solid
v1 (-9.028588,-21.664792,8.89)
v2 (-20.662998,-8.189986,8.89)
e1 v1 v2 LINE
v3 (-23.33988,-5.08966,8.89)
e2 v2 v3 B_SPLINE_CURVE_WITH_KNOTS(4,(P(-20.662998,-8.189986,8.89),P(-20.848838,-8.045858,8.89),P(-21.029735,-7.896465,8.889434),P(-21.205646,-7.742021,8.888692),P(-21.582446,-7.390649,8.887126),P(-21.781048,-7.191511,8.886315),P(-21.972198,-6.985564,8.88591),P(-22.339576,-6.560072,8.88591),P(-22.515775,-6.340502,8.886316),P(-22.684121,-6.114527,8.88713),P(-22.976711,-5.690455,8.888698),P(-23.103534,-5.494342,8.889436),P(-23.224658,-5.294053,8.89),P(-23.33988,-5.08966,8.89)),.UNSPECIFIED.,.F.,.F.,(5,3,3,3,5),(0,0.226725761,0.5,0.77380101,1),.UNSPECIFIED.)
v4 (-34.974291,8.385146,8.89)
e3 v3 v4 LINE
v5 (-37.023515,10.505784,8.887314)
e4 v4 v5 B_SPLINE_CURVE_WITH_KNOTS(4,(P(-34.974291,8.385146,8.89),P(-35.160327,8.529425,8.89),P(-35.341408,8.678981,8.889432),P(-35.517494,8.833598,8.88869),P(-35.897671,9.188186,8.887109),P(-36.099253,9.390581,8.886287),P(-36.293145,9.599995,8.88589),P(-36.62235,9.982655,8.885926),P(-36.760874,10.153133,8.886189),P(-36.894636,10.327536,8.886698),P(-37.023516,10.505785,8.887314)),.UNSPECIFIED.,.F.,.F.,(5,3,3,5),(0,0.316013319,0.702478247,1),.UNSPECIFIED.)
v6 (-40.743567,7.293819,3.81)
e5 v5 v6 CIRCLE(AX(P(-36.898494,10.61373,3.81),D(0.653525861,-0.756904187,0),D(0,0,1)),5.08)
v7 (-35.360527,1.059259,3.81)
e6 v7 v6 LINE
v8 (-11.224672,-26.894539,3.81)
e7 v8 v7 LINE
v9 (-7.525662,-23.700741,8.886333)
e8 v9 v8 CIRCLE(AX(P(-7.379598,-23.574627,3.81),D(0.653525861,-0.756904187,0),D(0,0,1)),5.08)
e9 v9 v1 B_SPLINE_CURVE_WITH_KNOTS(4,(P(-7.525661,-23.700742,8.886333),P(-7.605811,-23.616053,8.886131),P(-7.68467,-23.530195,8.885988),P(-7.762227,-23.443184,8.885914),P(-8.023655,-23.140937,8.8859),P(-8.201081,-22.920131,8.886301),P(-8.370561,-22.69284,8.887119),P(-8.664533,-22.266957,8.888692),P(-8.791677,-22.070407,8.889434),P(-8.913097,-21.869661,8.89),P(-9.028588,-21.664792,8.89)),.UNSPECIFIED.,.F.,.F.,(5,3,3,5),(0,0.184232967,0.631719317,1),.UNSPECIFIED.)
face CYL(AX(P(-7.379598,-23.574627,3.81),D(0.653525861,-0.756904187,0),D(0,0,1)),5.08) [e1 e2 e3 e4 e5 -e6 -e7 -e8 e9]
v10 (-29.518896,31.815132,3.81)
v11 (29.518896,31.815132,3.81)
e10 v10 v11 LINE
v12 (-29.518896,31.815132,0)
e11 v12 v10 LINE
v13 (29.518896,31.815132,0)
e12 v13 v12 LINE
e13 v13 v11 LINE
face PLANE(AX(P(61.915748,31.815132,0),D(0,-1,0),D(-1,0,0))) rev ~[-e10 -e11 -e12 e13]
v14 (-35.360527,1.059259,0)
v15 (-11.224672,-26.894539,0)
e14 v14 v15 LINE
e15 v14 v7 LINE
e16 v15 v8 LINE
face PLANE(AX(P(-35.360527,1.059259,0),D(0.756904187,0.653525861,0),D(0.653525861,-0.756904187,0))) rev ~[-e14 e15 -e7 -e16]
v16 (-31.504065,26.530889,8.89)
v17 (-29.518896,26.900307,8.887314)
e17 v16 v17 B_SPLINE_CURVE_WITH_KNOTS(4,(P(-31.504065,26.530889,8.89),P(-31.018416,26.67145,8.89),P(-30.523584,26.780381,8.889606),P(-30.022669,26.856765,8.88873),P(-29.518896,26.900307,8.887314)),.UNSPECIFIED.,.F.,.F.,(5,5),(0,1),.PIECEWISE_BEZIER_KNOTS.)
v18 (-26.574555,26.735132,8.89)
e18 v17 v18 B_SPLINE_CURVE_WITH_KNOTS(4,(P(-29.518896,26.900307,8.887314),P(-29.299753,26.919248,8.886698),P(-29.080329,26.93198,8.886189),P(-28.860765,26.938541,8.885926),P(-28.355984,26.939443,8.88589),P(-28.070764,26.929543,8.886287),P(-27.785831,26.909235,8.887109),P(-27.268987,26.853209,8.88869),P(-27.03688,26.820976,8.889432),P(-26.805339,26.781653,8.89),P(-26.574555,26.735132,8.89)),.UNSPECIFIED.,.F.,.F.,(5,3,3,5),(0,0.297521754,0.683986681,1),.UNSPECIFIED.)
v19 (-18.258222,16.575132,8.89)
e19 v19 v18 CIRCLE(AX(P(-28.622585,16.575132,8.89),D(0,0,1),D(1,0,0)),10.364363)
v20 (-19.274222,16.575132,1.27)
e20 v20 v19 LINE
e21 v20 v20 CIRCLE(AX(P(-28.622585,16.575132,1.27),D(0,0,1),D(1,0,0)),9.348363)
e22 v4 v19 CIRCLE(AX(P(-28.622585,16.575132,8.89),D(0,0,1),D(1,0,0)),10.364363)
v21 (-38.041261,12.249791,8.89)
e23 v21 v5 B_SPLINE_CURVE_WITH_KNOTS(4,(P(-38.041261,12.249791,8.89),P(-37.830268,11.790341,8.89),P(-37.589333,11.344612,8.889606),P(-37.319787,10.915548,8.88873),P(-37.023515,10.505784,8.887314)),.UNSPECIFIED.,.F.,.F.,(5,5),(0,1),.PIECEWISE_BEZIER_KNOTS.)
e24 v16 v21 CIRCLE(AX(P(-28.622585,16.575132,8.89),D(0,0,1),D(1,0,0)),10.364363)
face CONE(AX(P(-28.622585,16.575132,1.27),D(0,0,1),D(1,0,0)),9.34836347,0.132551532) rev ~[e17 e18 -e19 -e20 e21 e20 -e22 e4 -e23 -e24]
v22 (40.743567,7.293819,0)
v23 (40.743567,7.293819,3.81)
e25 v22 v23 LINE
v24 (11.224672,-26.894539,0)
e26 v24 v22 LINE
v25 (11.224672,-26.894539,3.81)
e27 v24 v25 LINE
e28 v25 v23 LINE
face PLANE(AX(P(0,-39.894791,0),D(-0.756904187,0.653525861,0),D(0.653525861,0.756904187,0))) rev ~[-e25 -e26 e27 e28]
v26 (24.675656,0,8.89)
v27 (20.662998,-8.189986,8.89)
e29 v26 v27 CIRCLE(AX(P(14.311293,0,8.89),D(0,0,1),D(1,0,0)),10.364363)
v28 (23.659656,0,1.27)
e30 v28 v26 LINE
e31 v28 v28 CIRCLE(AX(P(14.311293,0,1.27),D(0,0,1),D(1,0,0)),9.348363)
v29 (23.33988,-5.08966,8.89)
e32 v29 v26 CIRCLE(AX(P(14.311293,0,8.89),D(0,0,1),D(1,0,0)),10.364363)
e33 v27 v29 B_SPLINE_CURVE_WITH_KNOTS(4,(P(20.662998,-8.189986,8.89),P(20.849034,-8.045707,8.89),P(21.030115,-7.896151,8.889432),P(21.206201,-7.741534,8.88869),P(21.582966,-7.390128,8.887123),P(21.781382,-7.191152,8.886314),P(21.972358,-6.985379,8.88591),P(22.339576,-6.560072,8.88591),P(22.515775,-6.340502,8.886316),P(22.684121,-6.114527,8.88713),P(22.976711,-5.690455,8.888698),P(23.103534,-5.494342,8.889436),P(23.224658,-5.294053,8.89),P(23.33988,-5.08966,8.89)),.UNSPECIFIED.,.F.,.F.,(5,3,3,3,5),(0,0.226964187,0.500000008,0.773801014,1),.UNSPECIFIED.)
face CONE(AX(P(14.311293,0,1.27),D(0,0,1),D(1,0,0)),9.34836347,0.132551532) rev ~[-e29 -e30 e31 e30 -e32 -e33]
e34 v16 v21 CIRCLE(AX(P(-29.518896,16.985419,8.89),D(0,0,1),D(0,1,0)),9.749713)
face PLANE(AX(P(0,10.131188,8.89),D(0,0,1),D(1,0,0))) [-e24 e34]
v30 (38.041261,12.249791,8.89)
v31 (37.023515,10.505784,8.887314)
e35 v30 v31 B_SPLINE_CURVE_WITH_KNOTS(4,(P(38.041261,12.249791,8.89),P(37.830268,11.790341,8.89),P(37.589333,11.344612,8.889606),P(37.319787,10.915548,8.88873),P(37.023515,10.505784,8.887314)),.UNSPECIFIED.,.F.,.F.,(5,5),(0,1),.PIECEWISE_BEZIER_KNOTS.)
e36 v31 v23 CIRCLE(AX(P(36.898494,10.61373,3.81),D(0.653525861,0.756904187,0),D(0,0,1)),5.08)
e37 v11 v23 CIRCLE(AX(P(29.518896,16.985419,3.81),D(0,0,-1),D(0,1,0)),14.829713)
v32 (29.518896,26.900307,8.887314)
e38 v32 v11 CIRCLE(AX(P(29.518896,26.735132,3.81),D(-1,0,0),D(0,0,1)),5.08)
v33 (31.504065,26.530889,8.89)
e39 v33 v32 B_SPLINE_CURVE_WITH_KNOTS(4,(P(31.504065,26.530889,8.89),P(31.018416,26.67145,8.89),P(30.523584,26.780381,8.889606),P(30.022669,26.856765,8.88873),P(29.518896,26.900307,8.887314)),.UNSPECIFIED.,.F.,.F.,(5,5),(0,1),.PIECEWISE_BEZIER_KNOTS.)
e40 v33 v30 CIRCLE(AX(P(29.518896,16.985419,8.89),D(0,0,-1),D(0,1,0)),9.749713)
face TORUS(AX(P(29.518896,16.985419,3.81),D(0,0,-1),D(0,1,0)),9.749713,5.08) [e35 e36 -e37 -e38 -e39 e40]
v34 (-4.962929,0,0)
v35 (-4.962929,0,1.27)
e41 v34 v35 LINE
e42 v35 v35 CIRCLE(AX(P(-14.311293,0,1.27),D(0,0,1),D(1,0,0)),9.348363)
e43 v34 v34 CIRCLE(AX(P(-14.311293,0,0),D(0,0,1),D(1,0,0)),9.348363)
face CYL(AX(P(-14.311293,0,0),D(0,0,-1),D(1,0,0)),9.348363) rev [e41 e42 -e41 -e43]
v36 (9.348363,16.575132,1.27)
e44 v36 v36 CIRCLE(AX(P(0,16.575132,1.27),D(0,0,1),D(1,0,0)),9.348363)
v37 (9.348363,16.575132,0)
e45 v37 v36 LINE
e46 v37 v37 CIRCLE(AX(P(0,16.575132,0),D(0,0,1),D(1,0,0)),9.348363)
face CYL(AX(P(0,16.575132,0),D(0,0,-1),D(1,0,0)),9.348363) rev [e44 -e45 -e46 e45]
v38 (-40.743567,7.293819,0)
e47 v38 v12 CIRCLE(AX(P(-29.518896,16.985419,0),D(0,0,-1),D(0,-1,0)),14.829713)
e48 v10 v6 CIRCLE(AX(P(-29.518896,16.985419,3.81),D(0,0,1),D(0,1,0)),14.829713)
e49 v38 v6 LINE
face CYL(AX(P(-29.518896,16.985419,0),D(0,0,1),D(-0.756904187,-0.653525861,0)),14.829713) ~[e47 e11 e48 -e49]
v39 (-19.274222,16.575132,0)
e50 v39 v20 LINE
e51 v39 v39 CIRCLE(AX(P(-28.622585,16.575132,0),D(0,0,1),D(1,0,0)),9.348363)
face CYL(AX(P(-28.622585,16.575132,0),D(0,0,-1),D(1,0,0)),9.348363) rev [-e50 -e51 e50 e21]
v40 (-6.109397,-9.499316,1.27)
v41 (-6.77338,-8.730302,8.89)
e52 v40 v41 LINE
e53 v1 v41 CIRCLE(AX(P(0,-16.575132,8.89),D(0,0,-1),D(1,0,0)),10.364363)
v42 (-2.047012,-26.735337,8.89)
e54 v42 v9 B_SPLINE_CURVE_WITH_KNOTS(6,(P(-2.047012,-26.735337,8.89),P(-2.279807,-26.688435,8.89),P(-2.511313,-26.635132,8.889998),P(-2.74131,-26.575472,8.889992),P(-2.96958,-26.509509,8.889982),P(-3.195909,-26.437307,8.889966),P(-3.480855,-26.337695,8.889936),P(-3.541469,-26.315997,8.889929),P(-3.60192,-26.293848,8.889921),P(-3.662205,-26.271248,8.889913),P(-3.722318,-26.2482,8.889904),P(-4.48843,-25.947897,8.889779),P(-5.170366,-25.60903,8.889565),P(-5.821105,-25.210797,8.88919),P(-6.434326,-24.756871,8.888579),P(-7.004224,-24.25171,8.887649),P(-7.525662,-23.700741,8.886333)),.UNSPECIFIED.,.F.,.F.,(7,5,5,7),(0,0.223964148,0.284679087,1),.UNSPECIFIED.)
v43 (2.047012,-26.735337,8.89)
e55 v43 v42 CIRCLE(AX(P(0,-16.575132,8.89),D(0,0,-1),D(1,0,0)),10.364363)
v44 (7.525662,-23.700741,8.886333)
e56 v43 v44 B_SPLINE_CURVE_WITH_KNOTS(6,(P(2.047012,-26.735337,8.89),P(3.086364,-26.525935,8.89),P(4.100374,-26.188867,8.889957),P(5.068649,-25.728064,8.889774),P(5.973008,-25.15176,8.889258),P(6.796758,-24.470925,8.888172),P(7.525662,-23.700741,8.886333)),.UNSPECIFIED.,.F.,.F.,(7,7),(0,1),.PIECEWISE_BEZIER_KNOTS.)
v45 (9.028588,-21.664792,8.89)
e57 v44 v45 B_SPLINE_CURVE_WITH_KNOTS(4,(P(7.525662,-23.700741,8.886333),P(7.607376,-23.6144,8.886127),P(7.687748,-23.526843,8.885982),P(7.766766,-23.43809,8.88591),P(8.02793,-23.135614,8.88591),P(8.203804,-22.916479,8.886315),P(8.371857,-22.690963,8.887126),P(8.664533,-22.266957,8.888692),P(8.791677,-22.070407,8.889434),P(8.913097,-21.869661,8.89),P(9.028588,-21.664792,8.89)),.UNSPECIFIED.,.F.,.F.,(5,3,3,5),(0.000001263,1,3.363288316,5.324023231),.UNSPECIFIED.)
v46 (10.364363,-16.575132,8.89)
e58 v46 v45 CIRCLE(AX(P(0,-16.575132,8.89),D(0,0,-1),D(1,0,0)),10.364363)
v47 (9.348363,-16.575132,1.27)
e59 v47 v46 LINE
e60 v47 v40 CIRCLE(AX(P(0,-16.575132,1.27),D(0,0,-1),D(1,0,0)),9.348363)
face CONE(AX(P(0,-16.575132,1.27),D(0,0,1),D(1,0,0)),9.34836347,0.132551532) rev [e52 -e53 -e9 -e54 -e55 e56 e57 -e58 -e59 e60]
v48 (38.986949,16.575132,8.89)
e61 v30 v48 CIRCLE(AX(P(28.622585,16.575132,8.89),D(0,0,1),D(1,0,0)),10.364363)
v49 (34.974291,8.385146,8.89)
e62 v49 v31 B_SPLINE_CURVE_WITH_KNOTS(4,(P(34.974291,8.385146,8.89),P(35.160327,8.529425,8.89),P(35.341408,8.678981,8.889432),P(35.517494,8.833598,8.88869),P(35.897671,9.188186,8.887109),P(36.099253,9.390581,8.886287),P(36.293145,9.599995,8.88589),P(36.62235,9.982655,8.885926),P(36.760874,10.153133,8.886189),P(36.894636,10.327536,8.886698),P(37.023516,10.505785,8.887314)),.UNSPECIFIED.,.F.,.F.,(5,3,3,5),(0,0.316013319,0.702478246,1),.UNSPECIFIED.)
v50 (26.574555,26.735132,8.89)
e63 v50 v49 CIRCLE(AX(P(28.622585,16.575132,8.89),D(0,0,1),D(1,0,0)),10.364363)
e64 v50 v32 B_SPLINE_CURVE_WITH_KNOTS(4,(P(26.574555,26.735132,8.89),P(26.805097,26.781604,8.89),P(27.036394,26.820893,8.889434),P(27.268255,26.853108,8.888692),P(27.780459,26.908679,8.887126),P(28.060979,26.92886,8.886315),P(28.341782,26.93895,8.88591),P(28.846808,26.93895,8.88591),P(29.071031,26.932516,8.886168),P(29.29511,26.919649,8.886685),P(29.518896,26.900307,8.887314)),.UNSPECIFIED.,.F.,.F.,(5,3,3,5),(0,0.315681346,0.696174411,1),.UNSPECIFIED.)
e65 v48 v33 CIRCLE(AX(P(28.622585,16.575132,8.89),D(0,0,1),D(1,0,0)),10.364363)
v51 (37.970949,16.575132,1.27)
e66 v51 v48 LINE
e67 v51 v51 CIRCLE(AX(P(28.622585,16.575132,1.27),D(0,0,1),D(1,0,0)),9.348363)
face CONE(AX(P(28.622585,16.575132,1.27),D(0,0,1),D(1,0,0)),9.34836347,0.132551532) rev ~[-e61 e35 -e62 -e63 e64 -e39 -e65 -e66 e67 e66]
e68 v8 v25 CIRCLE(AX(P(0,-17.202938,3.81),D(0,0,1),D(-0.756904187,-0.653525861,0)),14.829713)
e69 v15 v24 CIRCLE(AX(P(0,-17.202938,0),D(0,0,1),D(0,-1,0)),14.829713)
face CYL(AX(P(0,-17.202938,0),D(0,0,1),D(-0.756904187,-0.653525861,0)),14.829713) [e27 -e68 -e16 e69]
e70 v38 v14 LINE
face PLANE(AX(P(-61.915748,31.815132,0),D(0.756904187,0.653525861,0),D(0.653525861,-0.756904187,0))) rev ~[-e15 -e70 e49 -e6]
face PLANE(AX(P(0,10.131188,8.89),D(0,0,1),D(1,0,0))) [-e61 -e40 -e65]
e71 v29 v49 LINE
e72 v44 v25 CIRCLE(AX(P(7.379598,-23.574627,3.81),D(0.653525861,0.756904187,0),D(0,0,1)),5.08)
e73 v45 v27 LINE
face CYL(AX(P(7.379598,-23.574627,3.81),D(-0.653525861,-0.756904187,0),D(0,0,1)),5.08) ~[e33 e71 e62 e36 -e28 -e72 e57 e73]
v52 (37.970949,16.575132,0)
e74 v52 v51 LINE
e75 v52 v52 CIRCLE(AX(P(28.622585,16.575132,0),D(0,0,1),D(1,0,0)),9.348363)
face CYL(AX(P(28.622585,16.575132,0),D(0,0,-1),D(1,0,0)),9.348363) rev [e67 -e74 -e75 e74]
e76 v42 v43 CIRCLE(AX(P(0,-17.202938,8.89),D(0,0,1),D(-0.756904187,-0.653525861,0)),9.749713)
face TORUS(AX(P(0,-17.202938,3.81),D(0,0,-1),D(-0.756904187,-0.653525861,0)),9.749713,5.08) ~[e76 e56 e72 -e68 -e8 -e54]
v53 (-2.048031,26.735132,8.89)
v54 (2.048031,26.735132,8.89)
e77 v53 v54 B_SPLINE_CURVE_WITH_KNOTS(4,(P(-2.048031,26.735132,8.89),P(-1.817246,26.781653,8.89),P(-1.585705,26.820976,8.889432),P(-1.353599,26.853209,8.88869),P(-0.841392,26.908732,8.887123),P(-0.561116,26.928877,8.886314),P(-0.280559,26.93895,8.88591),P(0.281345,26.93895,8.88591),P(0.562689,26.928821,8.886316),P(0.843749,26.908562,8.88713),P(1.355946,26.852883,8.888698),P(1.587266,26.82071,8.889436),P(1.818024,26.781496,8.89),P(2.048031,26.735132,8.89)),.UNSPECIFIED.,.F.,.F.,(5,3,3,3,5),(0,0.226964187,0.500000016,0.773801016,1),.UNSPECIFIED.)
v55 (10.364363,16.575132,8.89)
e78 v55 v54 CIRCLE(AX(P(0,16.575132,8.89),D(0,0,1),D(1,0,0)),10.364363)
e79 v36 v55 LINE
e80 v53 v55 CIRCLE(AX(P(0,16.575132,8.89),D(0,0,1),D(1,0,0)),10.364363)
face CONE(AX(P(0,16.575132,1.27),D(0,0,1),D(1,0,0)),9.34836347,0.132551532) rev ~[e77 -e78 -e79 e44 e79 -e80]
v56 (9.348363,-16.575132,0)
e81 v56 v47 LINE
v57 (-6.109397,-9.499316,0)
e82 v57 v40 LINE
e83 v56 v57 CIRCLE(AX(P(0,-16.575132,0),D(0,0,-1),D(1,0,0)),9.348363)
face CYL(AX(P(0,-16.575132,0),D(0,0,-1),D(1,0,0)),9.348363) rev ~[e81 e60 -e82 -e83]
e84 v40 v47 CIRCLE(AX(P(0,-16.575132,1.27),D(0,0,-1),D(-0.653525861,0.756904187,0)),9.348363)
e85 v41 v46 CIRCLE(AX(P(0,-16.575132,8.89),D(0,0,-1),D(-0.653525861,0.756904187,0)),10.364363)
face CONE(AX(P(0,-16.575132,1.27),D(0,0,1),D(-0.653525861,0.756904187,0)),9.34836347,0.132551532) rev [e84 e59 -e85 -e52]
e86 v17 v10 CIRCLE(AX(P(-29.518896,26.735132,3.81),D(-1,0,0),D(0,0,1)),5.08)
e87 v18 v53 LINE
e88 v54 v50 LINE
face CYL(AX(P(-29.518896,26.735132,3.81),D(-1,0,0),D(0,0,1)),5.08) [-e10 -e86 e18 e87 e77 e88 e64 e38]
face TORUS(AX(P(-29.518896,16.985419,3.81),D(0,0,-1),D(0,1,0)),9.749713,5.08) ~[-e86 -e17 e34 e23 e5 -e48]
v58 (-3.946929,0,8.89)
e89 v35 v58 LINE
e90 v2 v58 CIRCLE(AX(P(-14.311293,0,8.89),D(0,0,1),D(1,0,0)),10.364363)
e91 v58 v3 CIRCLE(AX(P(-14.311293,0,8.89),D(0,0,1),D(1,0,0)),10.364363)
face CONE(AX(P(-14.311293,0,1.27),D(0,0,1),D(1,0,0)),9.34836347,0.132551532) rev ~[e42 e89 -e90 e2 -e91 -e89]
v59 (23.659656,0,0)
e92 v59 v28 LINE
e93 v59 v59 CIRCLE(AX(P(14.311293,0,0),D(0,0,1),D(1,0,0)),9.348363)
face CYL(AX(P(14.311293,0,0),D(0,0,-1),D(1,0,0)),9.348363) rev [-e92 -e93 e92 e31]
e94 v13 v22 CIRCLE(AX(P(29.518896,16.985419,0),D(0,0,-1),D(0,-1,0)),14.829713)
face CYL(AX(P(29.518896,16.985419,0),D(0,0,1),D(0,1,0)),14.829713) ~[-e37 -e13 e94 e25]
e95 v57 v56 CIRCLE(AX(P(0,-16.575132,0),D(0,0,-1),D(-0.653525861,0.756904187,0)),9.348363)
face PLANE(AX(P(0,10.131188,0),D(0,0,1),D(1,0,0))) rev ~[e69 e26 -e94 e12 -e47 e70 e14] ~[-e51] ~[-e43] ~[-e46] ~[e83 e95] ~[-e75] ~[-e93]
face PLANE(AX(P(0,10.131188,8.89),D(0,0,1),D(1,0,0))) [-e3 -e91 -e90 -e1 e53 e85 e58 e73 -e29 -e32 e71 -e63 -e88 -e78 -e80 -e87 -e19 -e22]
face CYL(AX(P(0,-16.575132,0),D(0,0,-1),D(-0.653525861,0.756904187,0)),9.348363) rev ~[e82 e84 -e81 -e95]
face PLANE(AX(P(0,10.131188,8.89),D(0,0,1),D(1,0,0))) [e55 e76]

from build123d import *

# Parameters (mm, degrees)
F0_R         = 9.3483634699
F1_DEPTH     = 8.89
F2_R         = 14.8297125388
F3_SIZE2     = 1.016
F3_SIZE      = 7.62
F3_2_SIZE2   = 1.016
F3_2_SIZE    = 7.62
F3_3_SIZE2   = 1.016
F3_3_SIZE    = 7.62
F3_4_SIZE2   = 1.016
F3_4_SIZE    = 7.62
F3_5_SIZE2   = 1.016
F3_5_SIZE    = 7.62
F3_6_SIZE2   = 1.016
F3_6_SIZE    = 7.62
F4_T1_DEPTH  = 45.1686724369
F4_T3_DEPTH  = 45.1686724369
F4_T5_DEPTH  = 59.0377910967
F4_T8_ANGLE  = 130.8079672241
F4_T10_ANGLE = 98.3840655518
F4_T12_ANGLE = 130.8079672241


# Not quite as in the source:
# - a fillet or chamfer that OpenCascade refuses, or shapes differently, is made with other operations: its cross-section is extruded or revolved along the edge and cut away or added
# - a feature names something its author has since deleted; it is built from what else it names


with BuildPart() as f1:
    # F0 (on Top) → F1 (new body)
    with BuildSketch(Plane.XY):
        Polygon((-61.9157478895, 31.8151319193), (-35.3605267654, 1.0592594085), (0, -39.8947905701), (61.9157478895, 31.8151319193), (0, 31.8151319193), align=None)
        with BuildLine():
            ThreePointArc((-6.1093972864, -9.4993164637), (3.8909531705, -8.0749917446), (9.3483634699, -16.5751319193))
            ThreePointArc((9.3483634699, -16.5751319193), (-3.8909531705, -25.075272094), (-6.1093972864, -9.4993164637))
        make_face(mode=Mode.SUBTRACT)
        with Locations((-14.3112926848, 0)):
            Circle(F0_R, mode=Mode.SUBTRACT)
        with Locations((-28.6225853696, 16.5751319193)):
            Circle(F0_R, mode=Mode.SUBTRACT)
        with Locations((14.3112926848, 0)):
            Circle(F0_R, mode=Mode.SUBTRACT)
        with Locations((0, 16.5751319193)):
            Circle(F0_R, mode=Mode.SUBTRACT)
        with Locations((28.6225853696, 16.5751319193)):
            Circle(F0_R, mode=Mode.SUBTRACT)
    extrude(amount=F1_DEPTH)

    # F2
    f2_edges = [f1.edges().sort_by_distance(p)[0] for p in [
        (0, -39.894791, 4.445),
        (-61.915748, 31.815132, 4.445),
        (61.915748, 31.815132, 4.445),
    ]]
    fillet(f2_edges, radius=F2_R)

    # F3
    f3_edges = [f1.edges().sort_by_distance(p)[0] for p in [
        (-37.970949, 16.575132, 8.89),
    ]]
    f3_side = f1.faces().sort_by_distance((-37.970949, 16.575132, 4.445))[0]
    chamfer(f3_edges, length=F3_SIZE, length2=F3_SIZE2, reference=f3_side)

    # F3#2
    f3_2_edges = [f1.edges().sort_by_distance(p)[0] for p in [
        (-23.659656, 0, 8.89),
    ]]
    f3_2_side = f1.faces().sort_by_distance((-23.659656, 0, 4.445))[0]
    chamfer(f3_2_edges, length=F3_2_SIZE, length2=F3_2_SIZE2, reference=f3_2_side)

    # F3#3
    f3_3_edges = [f1.edges().sort_by_distance(p)[0] for p in [
        (-9.348363, 16.575132, 8.89),
    ]]
    f3_3_side = f1.faces().sort_by_distance((-9.348363, 16.575132, 4.445))[0]
    chamfer(f3_3_edges, length=F3_3_SIZE, length2=F3_3_SIZE2, reference=f3_3_side)

    # F3#4
    f3_4_edges = [f1.edges().sort_by_distance(p)[0] for p in [
        (4.962929, 0, 8.89),
    ]]
    f3_4_side = f1.faces().sort_by_distance((4.962929, 0, 4.445))[0]
    chamfer(f3_4_edges, length=F3_4_SIZE, length2=F3_4_SIZE2, reference=f3_4_side)

    # F3#5
    f3_5_edges = [f1.edges().sort_by_distance(p)[0] for p in [
        (19.274222, 16.575132, 8.89),
    ]]
    f3_5_side = f1.faces().sort_by_distance((19.274222, 16.575132, 4.445))[0]
    chamfer(f3_5_edges, length=F3_5_SIZE, length2=F3_5_SIZE2, reference=f3_5_side)

    # F3#6
    f3_6_edges = [f1.edges().sort_by_distance(p)[0] for p in [
        (6.109397, -23.650947, 8.89),
    ]]
    f3_6_side = f1.faces().sort_by_distance((6.109397, -23.650947, 4.445))[0]
    chamfer(f3_6_edges, length=F3_6_SIZE, length2=F3_6_SIZE2, reference=f3_6_side)

    # F4: fillet of radius 5.08 on 6 edges, made by hand

    # F4_s2 → F4_t1 (cut)
    with BuildSketch(Plane(origin=(8.5095443903, -9.8556310704, 0), x_dir=(0, 0, 1), z_dir=(-0.6535258611, 0.7569041874, 0))):
        with BuildLine():
            ThreePointArc((8.89, -20.9922773601), (7.4021024484, -24.5843798086), (3.81, -26.0722773601))
            Line((3.81, -26.0722773601), (8.89, -26.0722773601))
            Line((8.89, -26.0722773601), (8.89, -20.9922773601))
        make_face()
    extrude(amount=F4_T1_DEPTH, mode=Mode.SUBTRACT)

    # F4_s4 → F4_t3 (cut)
    with BuildSketch(Plane(origin=(-8.5095443903, -9.8556310704, 0), x_dir=(0, 0, 1), z_dir=(0.6535258611, 0.7569041874, 0))):
        with BuildLine():
            ThreePointArc((8.89, 20.9922773601), (7.4021024484, 24.5843798086), (3.81, 26.0722773601))
            Line((3.81, 26.0722773601), (8.89, 26.0722773601))
            Line((8.89, 26.0722773601), (8.89, 20.9922773601))
        make_face()
    extrude(amount=F4_T3_DEPTH, mode=Mode.SUBTRACT)

    # F4_s6 → F4_t5 (cut)
    with BuildSketch(Plane.YZ.offset(-29.5188955483)):
        with BuildLine():
            ThreePointArc((26.7351319193, 8.89), (30.3272343677, 7.4021024484), (31.8151319193, 3.81))
            Line((31.8151319193, 3.81), (31.8151319193, 8.89))
            Line((31.8151319193, 8.89), (26.7351319193, 8.89))
        make_face()
    extrude(amount=F4_T5_DEPTH, mode=Mode.SUBTRACT)

    # F4_s7 → F4_t8 (revolve, cut)
    with BuildSketch(Plane.YZ.offset(-29.5188955483)):
        with BuildLine():
            ThreePointArc((26.7351319193, 8.89), (30.3272343677, 7.4021024484), (31.8151319193, 3.81))
            Line((31.8151319193, 3.81), (31.8151319193, 8.89))
            Line((31.8151319193, 8.89), (26.7351319193, 8.89))
        make_face()
    revolve(axis=Axis((-29.5188955483, 16.9854193804, 8.89), (0, 0, 1)), revolution_arc=F4_T8_ANGLE, mode=Mode.SUBTRACT)

    # F4_s9 → F4_t10 (revolve, cut)
    with BuildSketch(Plane(origin=(8.5095443903, -9.8556310704, 0), x_dir=(0, 0, 1), z_dir=(-0.6535258611, 0.7569041874, 0))):
        with BuildLine():
            ThreePointArc((8.89, -20.9922773601), (7.4021024484, -24.5843798086), (3.81, -26.0722773601))
            Line((3.81, -26.0722773601), (8.89, -26.0722773601))
            Line((8.89, -26.0722773601), (8.89, -20.9922773601))
        make_face()
    revolve(axis=Axis((0, -17.202937926, 8.89), (0, 0, 1)), revolution_arc=F4_T10_ANGLE, mode=Mode.SUBTRACT)

    # F4_s11 → F4_t12 (revolve, cut)
    with BuildSketch(Plane.YZ.offset(29.5188955483)):
        with BuildLine():
            ThreePointArc((26.7351319193, 8.89), (30.3272343677, 7.4021024484), (31.8151319193, 3.81))
            Line((31.8151319193, 3.81), (31.8151319193, 8.89))
            Line((31.8151319193, 8.89), (26.7351319193, 8.89))
        make_face()
    revolve(axis=Axis((29.5188955483, 16.9854193804, 8.89), (0, 0, -1)), revolution_arc=F4_T12_ANGLE, mode=Mode.SUBTRACT)


solid = f1.part
